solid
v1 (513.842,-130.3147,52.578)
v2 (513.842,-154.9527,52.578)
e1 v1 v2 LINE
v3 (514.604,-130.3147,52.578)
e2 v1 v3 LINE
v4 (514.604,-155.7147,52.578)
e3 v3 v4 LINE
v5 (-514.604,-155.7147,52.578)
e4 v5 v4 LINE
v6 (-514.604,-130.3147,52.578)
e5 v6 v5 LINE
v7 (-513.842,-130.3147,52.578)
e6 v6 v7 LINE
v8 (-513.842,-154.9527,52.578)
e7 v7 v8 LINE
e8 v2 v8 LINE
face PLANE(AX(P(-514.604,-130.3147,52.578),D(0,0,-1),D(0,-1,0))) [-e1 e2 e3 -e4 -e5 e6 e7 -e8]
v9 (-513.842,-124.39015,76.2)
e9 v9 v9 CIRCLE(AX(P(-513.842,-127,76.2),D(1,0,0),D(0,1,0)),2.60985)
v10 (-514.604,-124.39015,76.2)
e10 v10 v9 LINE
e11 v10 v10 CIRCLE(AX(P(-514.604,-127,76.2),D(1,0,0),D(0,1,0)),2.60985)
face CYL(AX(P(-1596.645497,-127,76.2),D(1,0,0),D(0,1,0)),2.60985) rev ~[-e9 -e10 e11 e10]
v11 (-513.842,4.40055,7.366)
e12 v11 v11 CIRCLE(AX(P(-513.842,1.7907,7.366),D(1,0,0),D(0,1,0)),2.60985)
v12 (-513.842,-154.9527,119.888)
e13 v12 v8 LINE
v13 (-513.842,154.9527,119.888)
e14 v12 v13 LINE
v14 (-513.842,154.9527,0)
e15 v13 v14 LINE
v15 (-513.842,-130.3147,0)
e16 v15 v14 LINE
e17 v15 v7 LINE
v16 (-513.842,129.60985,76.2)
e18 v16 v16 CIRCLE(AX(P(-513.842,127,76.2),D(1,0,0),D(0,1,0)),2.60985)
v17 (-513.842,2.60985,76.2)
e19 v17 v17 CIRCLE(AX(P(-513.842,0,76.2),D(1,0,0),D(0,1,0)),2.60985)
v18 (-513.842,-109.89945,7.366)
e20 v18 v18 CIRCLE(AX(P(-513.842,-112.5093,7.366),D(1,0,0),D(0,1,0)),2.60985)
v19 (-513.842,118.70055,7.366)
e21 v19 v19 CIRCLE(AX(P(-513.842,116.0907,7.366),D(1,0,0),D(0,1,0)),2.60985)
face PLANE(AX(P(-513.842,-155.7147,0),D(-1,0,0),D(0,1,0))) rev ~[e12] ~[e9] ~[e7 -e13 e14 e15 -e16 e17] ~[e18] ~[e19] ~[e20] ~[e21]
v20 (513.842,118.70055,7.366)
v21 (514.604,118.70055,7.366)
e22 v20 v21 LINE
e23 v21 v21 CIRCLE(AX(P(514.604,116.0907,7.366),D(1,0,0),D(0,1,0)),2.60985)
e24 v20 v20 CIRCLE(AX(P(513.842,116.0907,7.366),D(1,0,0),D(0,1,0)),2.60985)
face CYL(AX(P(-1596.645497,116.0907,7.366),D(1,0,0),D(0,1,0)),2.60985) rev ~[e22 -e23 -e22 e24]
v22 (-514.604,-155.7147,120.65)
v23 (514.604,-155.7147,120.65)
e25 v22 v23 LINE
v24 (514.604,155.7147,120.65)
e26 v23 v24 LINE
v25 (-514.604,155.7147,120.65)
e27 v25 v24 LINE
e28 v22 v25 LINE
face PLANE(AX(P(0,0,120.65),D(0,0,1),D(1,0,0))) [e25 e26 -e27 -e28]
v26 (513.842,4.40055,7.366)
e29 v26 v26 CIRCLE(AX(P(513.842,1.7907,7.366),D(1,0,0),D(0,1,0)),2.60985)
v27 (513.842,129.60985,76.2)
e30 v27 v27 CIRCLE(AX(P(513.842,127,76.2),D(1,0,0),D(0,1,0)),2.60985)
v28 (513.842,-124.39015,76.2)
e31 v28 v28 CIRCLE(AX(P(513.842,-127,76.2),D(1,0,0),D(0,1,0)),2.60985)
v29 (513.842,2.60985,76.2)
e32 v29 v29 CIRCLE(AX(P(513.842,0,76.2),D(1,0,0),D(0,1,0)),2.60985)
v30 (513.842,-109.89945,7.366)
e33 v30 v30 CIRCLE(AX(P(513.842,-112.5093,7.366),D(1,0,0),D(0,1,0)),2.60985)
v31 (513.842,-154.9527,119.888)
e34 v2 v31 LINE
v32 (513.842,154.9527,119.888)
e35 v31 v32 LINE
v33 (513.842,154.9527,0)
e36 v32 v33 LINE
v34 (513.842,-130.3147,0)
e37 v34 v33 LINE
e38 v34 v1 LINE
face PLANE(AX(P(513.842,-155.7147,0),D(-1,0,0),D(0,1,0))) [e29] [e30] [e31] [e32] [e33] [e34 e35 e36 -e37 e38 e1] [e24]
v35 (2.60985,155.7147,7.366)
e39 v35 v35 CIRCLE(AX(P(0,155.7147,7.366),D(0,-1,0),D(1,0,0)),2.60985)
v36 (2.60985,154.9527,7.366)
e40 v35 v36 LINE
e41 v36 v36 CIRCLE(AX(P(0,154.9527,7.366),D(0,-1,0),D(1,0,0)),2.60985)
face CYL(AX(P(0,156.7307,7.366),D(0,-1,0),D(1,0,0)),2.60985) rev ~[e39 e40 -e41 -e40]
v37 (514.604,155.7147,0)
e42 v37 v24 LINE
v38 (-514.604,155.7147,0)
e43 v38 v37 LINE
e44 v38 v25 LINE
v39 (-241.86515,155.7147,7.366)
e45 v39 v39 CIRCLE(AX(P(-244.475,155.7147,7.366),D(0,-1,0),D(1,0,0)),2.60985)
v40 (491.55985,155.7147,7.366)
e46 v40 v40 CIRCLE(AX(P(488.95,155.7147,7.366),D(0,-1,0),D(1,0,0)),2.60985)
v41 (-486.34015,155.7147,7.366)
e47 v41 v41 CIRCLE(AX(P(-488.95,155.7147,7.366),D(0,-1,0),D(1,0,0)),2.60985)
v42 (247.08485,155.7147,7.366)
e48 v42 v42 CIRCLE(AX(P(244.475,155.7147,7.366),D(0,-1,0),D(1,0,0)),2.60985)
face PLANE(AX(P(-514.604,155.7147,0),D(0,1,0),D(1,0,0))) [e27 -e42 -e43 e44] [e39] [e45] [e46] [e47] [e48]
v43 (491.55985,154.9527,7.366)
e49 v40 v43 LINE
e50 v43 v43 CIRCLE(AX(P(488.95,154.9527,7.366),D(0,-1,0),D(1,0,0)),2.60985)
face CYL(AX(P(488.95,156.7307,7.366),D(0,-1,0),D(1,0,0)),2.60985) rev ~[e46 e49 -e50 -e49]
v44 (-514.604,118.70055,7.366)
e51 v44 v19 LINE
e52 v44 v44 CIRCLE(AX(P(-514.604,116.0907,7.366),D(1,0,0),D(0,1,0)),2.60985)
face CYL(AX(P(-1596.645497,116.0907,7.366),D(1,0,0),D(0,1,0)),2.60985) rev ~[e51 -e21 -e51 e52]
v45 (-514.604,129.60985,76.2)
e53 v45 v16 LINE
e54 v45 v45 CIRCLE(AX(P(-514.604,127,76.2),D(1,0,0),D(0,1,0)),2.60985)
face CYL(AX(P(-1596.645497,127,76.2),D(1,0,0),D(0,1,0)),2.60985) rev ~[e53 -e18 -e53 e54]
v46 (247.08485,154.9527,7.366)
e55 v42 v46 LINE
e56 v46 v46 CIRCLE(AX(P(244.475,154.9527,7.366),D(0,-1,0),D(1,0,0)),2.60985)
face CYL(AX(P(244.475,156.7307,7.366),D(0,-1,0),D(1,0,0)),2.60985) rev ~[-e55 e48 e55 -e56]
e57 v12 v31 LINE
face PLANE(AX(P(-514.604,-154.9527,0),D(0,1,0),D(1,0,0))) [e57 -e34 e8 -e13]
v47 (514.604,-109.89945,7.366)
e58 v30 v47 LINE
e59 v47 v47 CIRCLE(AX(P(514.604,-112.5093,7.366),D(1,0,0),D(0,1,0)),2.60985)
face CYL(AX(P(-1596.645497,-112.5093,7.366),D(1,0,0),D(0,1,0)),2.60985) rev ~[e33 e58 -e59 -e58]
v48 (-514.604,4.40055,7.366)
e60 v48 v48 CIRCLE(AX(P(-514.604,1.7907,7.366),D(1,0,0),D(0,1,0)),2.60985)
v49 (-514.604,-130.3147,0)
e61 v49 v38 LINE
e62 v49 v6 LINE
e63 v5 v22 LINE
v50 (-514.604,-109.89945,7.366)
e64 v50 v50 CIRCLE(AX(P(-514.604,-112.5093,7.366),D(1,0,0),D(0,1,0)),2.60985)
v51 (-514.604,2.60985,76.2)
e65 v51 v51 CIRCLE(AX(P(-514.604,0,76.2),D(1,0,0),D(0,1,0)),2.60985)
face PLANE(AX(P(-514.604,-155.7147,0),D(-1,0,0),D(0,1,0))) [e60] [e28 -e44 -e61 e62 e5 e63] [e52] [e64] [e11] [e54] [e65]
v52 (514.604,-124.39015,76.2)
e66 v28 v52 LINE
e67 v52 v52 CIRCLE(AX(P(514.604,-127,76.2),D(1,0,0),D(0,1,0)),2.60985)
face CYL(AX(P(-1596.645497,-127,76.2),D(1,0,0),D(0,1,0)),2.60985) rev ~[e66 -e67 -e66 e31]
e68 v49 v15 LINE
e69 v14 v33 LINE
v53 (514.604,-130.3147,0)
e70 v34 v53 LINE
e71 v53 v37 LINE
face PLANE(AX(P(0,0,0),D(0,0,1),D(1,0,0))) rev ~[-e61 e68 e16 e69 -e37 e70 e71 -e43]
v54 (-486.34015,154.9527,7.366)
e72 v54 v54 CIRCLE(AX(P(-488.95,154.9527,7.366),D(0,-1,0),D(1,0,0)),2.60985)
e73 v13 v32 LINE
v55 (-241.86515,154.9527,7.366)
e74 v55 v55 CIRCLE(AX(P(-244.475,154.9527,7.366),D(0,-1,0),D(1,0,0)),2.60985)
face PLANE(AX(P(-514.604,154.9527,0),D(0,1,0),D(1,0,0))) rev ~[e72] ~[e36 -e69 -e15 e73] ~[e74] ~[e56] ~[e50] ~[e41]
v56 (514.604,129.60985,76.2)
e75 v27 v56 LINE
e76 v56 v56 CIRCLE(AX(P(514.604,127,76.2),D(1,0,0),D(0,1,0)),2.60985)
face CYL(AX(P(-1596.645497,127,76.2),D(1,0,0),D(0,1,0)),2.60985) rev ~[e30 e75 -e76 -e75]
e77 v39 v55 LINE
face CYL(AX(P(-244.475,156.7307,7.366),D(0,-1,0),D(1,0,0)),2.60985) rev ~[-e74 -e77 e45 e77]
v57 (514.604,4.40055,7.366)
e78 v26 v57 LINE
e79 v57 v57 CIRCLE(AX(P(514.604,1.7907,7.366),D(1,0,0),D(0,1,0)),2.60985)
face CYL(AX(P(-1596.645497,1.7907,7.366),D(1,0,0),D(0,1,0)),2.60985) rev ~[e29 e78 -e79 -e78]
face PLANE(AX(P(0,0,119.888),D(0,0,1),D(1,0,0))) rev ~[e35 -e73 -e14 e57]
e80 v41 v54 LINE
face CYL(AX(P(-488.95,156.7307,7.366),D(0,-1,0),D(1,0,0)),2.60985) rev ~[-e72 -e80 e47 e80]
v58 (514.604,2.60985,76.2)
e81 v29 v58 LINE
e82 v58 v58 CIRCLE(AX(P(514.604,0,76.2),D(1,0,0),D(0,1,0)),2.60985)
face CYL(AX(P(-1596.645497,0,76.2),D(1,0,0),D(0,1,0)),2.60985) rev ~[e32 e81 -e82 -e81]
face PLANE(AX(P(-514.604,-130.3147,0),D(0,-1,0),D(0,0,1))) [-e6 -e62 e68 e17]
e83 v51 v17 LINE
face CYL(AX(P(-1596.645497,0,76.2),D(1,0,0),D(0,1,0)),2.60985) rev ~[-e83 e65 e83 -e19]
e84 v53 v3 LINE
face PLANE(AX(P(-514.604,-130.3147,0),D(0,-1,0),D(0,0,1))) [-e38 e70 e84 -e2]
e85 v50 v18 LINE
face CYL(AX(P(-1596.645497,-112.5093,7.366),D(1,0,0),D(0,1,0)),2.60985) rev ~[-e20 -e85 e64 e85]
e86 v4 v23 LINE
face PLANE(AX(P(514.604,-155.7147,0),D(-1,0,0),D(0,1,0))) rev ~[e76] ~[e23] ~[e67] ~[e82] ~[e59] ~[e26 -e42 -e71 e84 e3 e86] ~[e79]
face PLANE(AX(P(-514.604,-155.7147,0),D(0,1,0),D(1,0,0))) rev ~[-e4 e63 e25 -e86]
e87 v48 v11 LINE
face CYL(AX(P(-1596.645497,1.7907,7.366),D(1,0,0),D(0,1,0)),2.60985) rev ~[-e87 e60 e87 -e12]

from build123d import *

# Parameters (mm, degrees)
F0_W     = 1029.208
F0_H     = 311.4294
F1_DEPTH = 120.65
F2_T     = -0.762
F3_W     = 25.4
F3_H     = 52.578
F4_DEPTH = 1029.209
F6_D     = 5.2197
F6_DEPTH = 1.016
F6_TIP   = 1.5681560866
F8_D     = 5.2197
F10_D    = 5.2197


# Not quite as in the source:
# - a feature names something its author has since deleted; it is built from what else it names


with BuildPart() as f1:
    # F0 (on Top) → F1 (new body)
    with BuildSketch(Plane.XY):
        Rectangle(F0_W, F0_H)
    extrude(amount=F1_DEPTH)

    # F2
    f2_openings = [f1.faces().sort_by_distance(p)[0] for p in [
        (0, 0, 0),
    ]]
    offset(amount=F2_T, openings=f2_openings)

    # F3 (on face) → F4 (cut, through all)
    with BuildSketch(Plane(origin=(-514.604, 0, 0), x_dir=(0, -1, 0), z_dir=(-1, 0, 0))):
        with Locations((143.0147, 26.289)):
            Rectangle(F3_W, F3_H)
    extrude(amount=-F4_DEPTH, mode=Mode.SUBTRACT)

    # F6
    with Locations(Plane(origin=(0, 155.7147, 0), x_dir=(-1, 0, 0), z_dir=(0, 1, 0))):
        with Locations((-488.95, 7.366), (488.95, 7.366), (0, 7.366), (-244.475, 7.366), (244.475, 7.366)):
            Hole(F6_D / 2, depth=F6_DEPTH)
            with Locations((0, 0, -(F6_DEPTH + F6_TIP / 2))):  # 118° drill point
                Cone(0, F6_D / 2, F6_TIP, mode=Mode.SUBTRACT)

    # F8 (through all)
    with Locations(Plane(origin=(-514.604, 0, 0), x_dir=(0, -1, 0), z_dir=(-1, 0, 0))):
        with Locations((-116.0907, 7.366), (-1.7907, 7.366), (112.5093, 7.366)):
            Hole(F8_D / 2)

    # F10 (through all)
    with Locations(Plane(origin=(-514.604, 0, 0), x_dir=(0, -1, 0), z_dir=(-1, 0, 0))):
        with Locations((-127, 76.2), (0, 76.2), (127, 76.2)):
            Hole(F10_D / 2)


solid = f1.part
